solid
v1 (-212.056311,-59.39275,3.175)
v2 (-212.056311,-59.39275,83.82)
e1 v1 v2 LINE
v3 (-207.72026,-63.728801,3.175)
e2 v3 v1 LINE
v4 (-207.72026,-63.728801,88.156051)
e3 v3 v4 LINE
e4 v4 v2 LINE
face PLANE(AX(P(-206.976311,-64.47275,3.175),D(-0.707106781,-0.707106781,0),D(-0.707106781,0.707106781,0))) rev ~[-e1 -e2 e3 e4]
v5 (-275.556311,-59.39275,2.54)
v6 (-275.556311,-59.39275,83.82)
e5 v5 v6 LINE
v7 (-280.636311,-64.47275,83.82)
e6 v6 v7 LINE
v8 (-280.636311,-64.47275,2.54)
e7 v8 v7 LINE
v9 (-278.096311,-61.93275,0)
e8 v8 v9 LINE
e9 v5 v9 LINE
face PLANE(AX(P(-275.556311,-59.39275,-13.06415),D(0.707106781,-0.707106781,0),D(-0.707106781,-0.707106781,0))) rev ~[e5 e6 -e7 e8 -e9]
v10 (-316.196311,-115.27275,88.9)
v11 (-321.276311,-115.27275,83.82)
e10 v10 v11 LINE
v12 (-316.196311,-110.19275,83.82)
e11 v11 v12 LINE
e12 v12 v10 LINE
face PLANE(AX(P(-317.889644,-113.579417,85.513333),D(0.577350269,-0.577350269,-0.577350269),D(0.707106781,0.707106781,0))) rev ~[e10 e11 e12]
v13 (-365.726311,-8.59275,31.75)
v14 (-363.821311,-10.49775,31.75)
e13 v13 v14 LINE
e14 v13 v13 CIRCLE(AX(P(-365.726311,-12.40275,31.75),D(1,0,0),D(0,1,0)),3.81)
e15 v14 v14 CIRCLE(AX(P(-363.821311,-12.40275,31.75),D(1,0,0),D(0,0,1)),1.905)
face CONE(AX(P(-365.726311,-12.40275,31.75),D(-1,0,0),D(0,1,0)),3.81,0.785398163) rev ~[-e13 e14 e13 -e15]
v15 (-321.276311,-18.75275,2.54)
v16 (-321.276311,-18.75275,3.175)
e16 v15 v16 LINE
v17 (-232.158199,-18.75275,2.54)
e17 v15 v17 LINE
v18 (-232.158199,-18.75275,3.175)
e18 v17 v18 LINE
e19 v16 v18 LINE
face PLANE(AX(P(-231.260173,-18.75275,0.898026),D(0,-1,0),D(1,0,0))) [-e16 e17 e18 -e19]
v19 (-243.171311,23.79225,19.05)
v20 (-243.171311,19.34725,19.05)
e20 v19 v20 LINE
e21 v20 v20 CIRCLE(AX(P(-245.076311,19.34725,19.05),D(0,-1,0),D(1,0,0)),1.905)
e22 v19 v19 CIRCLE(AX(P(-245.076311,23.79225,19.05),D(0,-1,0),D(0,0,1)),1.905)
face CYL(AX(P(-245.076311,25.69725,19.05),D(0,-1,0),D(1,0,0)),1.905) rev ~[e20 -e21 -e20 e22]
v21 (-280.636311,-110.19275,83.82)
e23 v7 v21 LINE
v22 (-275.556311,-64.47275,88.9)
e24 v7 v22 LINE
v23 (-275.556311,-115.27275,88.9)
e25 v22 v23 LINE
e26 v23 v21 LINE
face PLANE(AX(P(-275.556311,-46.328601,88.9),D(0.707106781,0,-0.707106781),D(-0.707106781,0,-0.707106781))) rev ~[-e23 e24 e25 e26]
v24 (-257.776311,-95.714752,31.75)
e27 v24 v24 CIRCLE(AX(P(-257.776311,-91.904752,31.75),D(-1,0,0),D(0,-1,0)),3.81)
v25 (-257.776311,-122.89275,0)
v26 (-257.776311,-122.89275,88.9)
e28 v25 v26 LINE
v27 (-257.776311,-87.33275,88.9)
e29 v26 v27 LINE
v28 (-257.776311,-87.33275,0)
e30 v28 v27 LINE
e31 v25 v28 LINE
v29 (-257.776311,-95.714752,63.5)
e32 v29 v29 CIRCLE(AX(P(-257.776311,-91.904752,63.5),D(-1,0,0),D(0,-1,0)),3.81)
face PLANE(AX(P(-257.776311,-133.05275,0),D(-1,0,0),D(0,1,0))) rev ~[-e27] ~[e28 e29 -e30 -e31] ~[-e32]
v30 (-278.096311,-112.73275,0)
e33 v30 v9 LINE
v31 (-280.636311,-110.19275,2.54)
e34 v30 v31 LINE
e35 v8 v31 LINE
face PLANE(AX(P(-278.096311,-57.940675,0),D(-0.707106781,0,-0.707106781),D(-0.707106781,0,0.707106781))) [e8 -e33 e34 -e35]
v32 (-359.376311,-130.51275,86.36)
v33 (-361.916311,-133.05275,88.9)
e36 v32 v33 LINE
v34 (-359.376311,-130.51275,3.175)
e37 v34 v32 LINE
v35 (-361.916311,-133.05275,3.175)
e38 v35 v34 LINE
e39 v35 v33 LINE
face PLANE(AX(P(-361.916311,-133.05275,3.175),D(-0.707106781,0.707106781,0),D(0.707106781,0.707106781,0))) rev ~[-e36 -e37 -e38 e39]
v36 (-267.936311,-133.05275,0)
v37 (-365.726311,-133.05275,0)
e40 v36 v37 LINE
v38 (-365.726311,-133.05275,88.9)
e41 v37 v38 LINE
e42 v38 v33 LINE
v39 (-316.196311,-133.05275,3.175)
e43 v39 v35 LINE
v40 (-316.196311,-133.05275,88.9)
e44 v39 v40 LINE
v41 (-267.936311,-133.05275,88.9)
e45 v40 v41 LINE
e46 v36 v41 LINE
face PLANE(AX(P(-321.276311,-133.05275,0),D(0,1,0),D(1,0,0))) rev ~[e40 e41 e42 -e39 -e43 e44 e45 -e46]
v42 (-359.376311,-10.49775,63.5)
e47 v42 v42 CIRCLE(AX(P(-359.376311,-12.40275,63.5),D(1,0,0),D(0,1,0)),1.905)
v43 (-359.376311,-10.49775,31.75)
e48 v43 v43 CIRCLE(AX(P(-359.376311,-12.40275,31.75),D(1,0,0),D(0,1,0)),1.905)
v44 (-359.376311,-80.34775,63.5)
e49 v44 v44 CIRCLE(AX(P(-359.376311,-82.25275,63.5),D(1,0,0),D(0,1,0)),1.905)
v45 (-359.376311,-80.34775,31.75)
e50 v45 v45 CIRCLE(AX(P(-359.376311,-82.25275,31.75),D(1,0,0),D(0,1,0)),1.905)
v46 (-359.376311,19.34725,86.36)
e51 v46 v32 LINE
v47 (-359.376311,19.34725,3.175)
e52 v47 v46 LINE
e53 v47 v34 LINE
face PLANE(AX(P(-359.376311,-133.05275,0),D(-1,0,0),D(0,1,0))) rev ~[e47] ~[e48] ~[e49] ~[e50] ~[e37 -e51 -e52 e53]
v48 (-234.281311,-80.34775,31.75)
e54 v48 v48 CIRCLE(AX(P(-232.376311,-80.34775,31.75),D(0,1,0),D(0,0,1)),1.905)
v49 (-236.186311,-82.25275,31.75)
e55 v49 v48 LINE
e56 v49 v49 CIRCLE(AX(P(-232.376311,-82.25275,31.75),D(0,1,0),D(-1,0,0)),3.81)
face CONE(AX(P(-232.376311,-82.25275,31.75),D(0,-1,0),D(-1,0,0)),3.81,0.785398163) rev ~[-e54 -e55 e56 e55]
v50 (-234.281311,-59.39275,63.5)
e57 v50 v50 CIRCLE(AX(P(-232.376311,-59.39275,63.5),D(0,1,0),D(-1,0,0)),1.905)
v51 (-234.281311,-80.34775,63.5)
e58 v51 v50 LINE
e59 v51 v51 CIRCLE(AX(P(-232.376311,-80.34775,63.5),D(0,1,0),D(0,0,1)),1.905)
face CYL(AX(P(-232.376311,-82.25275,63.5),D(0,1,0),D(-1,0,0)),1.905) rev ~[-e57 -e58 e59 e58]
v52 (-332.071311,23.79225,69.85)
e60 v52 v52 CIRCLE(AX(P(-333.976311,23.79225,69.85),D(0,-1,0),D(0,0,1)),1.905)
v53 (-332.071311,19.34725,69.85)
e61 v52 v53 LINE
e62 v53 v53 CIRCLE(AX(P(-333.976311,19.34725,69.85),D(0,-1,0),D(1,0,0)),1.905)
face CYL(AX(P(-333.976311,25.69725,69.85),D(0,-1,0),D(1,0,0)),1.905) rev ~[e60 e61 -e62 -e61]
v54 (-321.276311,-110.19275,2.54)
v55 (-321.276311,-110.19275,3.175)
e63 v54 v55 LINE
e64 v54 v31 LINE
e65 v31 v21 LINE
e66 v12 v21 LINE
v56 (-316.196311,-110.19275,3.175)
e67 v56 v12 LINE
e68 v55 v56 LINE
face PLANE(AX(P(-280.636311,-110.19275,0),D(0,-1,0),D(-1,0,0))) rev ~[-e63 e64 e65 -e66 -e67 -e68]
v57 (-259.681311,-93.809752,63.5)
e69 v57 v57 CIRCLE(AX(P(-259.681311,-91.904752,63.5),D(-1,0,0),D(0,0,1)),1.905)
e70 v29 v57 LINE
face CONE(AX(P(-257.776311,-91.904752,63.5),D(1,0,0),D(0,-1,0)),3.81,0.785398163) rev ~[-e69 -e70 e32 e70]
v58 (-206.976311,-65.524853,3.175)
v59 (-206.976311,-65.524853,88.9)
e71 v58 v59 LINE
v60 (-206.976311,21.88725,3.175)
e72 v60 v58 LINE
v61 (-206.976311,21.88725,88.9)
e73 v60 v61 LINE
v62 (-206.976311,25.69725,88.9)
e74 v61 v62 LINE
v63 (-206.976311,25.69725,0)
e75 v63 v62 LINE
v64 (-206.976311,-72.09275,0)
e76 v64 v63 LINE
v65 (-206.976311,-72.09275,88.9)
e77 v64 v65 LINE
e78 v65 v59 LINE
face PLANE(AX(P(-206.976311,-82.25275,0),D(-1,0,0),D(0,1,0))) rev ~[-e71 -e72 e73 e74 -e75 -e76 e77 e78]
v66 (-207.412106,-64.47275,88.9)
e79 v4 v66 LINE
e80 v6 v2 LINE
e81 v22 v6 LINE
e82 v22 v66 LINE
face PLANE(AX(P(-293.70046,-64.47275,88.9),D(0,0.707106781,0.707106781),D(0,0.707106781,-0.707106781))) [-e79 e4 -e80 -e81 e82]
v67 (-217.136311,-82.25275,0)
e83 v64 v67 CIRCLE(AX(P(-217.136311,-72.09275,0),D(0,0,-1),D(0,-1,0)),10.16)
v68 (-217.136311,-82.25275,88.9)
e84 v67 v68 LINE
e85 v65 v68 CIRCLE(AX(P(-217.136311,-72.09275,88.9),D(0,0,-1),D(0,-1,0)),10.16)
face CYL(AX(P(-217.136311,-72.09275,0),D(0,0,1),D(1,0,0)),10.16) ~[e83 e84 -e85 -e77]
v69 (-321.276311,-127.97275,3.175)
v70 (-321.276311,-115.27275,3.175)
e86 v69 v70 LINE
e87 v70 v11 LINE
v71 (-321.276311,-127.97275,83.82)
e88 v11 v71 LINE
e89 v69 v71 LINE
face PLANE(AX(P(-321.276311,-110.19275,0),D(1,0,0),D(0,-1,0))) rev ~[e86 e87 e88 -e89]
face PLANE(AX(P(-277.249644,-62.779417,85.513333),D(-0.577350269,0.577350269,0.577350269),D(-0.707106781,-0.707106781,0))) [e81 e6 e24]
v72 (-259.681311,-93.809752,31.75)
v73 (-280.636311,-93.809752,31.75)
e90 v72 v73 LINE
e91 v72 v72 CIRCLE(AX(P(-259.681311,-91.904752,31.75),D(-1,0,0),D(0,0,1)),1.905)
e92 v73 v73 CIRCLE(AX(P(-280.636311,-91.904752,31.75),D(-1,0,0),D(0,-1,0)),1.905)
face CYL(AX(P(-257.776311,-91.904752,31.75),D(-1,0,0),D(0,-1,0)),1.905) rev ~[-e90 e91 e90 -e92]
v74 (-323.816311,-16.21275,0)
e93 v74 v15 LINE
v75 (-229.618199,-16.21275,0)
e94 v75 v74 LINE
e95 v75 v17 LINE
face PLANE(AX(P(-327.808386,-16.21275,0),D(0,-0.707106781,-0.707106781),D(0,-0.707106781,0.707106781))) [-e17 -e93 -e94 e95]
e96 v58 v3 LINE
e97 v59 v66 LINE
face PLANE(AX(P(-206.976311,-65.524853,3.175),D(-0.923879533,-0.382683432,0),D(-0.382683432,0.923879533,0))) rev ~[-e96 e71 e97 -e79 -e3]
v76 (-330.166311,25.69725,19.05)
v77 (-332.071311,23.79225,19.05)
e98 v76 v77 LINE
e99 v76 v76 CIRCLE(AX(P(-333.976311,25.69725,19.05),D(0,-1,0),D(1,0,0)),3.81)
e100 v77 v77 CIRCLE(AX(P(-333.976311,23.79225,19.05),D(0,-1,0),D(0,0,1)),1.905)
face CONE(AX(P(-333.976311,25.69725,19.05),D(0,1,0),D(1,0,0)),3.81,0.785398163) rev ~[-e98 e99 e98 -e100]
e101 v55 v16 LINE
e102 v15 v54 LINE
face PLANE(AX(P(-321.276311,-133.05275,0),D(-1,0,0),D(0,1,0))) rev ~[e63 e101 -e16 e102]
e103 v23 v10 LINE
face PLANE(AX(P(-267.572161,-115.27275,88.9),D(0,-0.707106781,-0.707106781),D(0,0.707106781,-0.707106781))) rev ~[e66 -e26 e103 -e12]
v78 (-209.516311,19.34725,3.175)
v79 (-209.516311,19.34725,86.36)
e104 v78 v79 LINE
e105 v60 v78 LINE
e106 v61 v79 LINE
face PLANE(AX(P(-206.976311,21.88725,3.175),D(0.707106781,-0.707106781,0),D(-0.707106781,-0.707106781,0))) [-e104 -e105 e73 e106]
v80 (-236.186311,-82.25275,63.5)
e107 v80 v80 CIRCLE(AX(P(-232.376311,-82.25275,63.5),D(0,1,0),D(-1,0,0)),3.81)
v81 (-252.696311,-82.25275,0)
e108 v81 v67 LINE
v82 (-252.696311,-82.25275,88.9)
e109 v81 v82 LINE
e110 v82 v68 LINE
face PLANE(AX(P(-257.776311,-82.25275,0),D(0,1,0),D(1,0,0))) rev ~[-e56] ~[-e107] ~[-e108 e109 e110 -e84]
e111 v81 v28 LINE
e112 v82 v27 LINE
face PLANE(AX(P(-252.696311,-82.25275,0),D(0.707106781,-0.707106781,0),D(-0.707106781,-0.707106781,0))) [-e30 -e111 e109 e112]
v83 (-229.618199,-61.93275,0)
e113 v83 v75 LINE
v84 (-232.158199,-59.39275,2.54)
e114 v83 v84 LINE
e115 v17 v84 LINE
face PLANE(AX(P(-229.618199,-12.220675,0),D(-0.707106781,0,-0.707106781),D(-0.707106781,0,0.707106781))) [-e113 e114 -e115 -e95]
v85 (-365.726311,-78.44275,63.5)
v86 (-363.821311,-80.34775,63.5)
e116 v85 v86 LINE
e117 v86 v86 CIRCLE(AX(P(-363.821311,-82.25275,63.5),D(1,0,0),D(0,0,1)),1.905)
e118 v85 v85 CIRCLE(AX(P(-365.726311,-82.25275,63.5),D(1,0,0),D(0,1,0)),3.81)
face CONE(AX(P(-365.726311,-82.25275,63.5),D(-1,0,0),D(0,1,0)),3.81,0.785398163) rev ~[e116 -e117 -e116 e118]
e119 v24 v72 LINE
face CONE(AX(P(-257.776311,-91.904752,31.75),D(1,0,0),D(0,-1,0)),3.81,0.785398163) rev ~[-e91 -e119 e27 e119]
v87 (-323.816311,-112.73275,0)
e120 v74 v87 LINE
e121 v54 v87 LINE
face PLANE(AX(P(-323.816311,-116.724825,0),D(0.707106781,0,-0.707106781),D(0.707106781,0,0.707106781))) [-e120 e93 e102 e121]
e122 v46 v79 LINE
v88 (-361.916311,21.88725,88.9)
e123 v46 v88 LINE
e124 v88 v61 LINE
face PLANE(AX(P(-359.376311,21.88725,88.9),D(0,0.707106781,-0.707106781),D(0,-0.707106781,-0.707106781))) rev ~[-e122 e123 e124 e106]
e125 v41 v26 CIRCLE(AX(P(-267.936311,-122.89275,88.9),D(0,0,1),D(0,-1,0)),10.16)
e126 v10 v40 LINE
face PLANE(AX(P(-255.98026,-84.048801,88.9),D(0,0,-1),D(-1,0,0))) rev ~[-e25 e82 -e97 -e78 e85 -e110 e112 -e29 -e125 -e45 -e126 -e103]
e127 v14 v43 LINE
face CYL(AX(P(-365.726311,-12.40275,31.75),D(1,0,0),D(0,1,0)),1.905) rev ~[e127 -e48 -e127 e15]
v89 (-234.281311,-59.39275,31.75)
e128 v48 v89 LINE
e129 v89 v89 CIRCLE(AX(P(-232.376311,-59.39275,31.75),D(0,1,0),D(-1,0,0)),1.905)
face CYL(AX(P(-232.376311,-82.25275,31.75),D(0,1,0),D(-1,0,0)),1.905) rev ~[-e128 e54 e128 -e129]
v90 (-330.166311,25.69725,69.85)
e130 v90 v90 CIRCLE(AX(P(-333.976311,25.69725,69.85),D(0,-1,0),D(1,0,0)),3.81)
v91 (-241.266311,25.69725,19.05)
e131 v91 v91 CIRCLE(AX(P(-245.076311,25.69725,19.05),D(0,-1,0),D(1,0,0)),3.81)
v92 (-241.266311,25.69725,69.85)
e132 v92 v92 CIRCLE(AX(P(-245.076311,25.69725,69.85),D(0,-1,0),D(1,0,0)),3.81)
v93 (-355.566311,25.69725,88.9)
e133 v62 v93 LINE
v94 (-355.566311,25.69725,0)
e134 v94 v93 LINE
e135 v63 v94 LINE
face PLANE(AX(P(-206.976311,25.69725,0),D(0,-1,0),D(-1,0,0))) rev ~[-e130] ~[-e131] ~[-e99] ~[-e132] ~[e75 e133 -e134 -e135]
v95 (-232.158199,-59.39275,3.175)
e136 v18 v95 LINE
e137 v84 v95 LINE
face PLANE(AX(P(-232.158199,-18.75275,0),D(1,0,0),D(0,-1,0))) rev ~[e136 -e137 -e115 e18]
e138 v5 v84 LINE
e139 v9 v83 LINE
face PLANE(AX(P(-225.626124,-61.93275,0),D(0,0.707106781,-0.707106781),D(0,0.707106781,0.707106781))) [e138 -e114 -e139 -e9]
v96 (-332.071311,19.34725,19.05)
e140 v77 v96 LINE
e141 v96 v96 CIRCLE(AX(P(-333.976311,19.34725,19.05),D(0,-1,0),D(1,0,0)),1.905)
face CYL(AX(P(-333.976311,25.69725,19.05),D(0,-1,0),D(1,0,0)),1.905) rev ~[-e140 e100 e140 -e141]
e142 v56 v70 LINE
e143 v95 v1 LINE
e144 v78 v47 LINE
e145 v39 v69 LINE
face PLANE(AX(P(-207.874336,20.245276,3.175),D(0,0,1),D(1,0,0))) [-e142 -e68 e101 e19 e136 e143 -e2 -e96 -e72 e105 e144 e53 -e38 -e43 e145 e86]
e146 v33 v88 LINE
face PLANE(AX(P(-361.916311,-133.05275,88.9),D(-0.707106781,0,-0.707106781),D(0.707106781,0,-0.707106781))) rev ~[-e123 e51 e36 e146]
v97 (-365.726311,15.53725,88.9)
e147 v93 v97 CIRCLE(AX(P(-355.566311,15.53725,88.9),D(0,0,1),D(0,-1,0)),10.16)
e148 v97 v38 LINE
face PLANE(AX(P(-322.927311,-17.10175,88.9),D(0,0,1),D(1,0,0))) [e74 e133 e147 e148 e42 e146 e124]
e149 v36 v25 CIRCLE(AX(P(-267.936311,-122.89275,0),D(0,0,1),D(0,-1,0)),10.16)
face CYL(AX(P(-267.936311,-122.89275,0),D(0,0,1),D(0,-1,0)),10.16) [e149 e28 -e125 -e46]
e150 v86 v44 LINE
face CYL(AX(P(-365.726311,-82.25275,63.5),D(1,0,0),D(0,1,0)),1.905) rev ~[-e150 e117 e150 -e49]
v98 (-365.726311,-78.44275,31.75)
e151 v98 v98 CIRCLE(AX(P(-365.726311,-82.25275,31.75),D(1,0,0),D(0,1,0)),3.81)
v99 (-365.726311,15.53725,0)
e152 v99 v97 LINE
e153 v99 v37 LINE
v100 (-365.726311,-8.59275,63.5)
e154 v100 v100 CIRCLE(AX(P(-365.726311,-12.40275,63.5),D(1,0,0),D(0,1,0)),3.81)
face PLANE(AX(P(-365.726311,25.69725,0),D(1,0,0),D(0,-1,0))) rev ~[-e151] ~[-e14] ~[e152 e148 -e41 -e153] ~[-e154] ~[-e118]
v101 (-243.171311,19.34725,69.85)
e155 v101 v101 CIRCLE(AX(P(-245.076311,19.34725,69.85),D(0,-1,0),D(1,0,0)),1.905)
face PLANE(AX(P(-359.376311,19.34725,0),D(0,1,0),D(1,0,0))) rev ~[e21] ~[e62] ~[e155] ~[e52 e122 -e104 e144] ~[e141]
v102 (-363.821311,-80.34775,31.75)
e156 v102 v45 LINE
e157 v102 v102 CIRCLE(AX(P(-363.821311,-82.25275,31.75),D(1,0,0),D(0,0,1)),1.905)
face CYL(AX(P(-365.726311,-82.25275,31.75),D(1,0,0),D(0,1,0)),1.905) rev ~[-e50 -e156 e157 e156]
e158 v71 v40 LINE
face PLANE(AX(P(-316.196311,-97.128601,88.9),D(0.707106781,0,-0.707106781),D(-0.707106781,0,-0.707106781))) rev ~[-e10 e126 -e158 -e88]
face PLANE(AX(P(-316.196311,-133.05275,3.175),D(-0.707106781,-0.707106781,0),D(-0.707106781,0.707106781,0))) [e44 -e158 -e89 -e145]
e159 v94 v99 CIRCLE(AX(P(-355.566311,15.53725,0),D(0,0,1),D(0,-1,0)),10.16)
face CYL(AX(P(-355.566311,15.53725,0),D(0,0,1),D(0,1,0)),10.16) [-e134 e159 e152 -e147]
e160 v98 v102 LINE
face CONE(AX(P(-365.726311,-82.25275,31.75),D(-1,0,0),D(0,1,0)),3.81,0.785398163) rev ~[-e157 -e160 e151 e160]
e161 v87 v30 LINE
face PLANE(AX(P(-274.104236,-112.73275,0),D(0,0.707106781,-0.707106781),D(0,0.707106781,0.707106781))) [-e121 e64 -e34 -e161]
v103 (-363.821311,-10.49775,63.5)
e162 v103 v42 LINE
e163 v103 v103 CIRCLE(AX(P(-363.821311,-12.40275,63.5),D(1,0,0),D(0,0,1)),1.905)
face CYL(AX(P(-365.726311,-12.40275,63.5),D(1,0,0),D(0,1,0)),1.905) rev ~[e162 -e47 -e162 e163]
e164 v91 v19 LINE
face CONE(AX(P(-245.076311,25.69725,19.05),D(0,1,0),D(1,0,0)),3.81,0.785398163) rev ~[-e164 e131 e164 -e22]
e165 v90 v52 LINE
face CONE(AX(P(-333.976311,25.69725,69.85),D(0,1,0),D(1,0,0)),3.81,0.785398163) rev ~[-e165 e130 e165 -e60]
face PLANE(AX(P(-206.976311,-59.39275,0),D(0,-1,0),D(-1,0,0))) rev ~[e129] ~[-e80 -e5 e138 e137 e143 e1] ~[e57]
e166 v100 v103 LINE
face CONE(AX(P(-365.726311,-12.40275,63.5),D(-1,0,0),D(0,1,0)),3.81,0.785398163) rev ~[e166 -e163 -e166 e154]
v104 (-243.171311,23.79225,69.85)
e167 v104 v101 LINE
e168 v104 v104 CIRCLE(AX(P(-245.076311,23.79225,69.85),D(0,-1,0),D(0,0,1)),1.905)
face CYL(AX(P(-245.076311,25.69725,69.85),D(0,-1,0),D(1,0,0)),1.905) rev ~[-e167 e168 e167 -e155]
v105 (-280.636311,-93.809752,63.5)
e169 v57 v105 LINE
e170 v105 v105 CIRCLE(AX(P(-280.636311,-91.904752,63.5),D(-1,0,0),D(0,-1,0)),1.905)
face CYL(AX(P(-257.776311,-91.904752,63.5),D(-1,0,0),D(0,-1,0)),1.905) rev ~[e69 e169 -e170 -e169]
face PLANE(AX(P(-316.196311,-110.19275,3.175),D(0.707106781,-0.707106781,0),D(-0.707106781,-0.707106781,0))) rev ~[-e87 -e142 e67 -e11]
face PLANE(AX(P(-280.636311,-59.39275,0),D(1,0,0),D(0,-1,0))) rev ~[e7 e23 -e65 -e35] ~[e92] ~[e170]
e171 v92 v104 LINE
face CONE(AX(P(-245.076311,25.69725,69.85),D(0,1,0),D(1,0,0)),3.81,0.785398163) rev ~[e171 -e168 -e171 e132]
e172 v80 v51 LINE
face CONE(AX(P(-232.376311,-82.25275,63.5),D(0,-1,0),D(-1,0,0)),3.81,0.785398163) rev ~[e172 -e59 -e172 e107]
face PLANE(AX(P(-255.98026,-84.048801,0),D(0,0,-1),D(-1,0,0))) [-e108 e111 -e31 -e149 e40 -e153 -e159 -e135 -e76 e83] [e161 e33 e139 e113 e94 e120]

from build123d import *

# Parameters (mm, degrees)
F1_DEPTH        = 3.175
F2_DEPTH        = 88.9
F4_D            = 3.81
F4_DEPTH        = 25.4
F4_CSINK_D      = 7.62
F4_CSINK_ANGLE  = 90
F4_TIP          = 1.1446394792
F6_D            = 3.81
F6_DEPTH        = 25.4
F6_CSINK_D      = 7.62
F6_CSINK_ANGLE  = 90
F6_TIP          = 1.1446394792
F8_D            = 3.81
F8_DEPTH        = 25.4
F8_CSINK_D      = 7.62
F8_CSINK_ANGLE  = 90
F8_TIP          = 1.1446394792
F10_D           = 3.81
F10_DEPTH       = 25.4
F10_CSINK_D     = 7.62
F10_CSINK_ANGLE = 90
F10_TIP         = 1.1446394792
F11_T1_DEPTH    = 88.9
F11_T3_DEPTH    = 6.4524666085
F11_T5_DEPTH    = 6.4524666085
F11_T7_DEPTH    = 98.7891495789
F11_T9_DEPTH    = 115.0282991577
F11_T11_DEPTH   = 53.7041495789
F11_T13_DEPTH   = 63.8641495789
F11_T15_DEPTH   = 99.7882991577
F11_T17_DEPTH   = 48.9882991577
F11_T23_DEPTH   = 63.8641495789
F11_T27_DEPTH   = 53.7041495789
F12_R           = 10.16
F13_T1_DEPTH    = 91.44
F13_T3_DEPTH    = 52.2520747895
F13_T5_DEPTH    = 40.64
F13_T7_DEPTH    = 158.9320747894
F13_T9_DEPTH    = 158.9320747894
F13_T11_DEPTH   = 88.591569985
F13_T13_DEPTH   = 92.2570747894
F13_T15_DEPTH   = 49.9301865966
F13_T17_DEPTH   = 40.64
F13_T19_DEPTH   = 89.1181118071
F13_T25_DEPTH   = 47.1720747894
F13_T29_DEPTH   = 97.9720747894
F13_T36_DEPTH   = 95.6501865965
F13_T40_DEPTH   = 97.9720747894
F13_T47_DEPTH   = 47.1720747894
F13_T51_DEPTH   = 58.7841495789
F13_T58_DEPTH   = 158.9320747894
F13_S59_R       = 10.16
F13_T60_DEPTH   = 81
F13_T64_DEPTH   = 158.9320747894
F13_S66_R       = 10.16
F13_T67_DEPTH   = 81
F13_T73_DEPTH   = 56.462261386
F13_T77_DEPTH   = 47.1720747894
F13_T84_DEPTH   = 47.1720747894
F13_T88_DEPTH   = 95.6501865965


# Not quite as in the source:
# - a fillet or chamfer that OpenCascade refuses, or shapes differently, is made with other operations: its cross-section is extruded or revolved along the edge and cut away or added
# - a feature of the source that left no trace in its solid (it failed there, or was rolled back) is left out
# - a feature names something its author has since deleted; it is built from what else it names


with BuildPart() as f1:
    # F0 (on Top) → F1 (new body)
    with BuildSketch(Plane.XY):
        Polygon((-206.9763107598, 19.3472499192), (-359.3763107598, 19.3472499192), (-359.3763107598, -133.0527500808), (-321.2763107598, -133.0527500808), (-321.2763107598, -110.1927500808), (-321.2763107598, -18.7527500808), (-232.3763107598, -18.7527500808), (-232.1581989527, -18.7527500808), (-232.1581989527, -59.3927500808), (-206.9763107598, -59.3927500808), align=None)
    extrude(amount=F1_DEPTH)

    # F0 (on Top) → F2 (join)
    with BuildSketch(Plane.XY):
        Polygon((-206.9763107598, -82.2527500808), (-206.9763107598, -59.3927500808), (-232.1581989527, -59.3927500808), (-232.3763107598, -59.3927500808), (-280.6363107598, -59.3927500808), (-280.6363107598, -110.1927500808), (-321.2763107598, -110.1927500808), (-321.2763107598, -133.0527500808), (-257.7763107598, -133.0527500808), (-257.7763107598, -82.2527500808), align=None)
        Polygon((-359.3763107598, -133.0527500808), (-359.3763107598, 19.3472499192), (-206.9763107598, 19.3472499192), (-206.9763107598, 25.6972499192), (-365.7263107598, 25.6972499192), (-365.7263107598, -133.0527500808), align=None)
    extrude(amount=F2_DEPTH)

    # F4
    with Locations(Plane.XZ.offset(82.2527500808)):
        with Locations((-232.3763107598, 63.5), (-232.3763107598, 31.75)):
            CounterSinkHole(F4_D / 2, F4_CSINK_D / 2, depth=F4_DEPTH, counter_sink_angle=F4_CSINK_ANGLE)
            with Locations((0, 0, -(F4_DEPTH + F4_TIP / 2))):  # 118° drill point
                Cone(0, F4_D / 2, F4_TIP, mode=Mode.SUBTRACT)

    # F6
    with Locations(Plane.YZ.offset(-257.7763107598)):
        with Locations((-91.9047519565, 63.5), (-91.9047519565, 31.75)):
            CounterSinkHole(F6_D / 2, F6_CSINK_D / 2, depth=F6_DEPTH, counter_sink_angle=F6_CSINK_ANGLE)
            with Locations((0, 0, -(F6_DEPTH + F6_TIP / 2))):  # 118° drill point
                Cone(0, F6_D / 2, F6_TIP, mode=Mode.SUBTRACT)

    # F8
    with Locations(Plane(origin=(-365.7263107598, 0, 0), x_dir=(0, -1, 0), z_dir=(-1, 0, 0))):
        with Locations((12.4027500808, 63.5), (82.2527500808, 63.5), (82.2527500808, 31.75), (12.4027500808, 31.75)):
            CounterSinkHole(F8_D / 2, F8_CSINK_D / 2, depth=F8_DEPTH, counter_sink_angle=F8_CSINK_ANGLE)
            with Locations((0, 0, -(F8_DEPTH + F8_TIP / 2))):  # 118° drill point
                Cone(0, F8_D / 2, F8_TIP, mode=Mode.SUBTRACT)

    # F10
    with Locations(Plane(origin=(0, 25.6972499192, 0), x_dir=(-1, 0, 0), z_dir=(0, 1, 0))):
        with Locations((245.0763107598, 69.85), (245.0763107598, 19.05), (333.9763107598, 19.05), (333.9763107598, 69.85)):
            CounterSinkHole(F10_D / 2, F10_CSINK_D / 2, depth=F10_DEPTH, counter_sink_angle=F10_CSINK_ANGLE)
            with Locations((0, 0, -(F10_DEPTH + F10_TIP / 2))):  # 118° drill point
                Cone(0, F10_D / 2, F10_TIP, mode=Mode.SUBTRACT)

    # F11: chamfer of 5.08 on 10 edges, made by hand

    # F11_s2 → F11_t1 (join)
    with BuildSketch(Plane.XY):
        Polygon((-252.6963107598, -82.2527500808), (-257.7763107598, -87.3327500808), (-257.7763107598, -82.2527500808), align=None)
    extrude(amount=F11_T1_DEPTH)

    # F11_s4 → F11_t3 (cut)
    with BuildSketch(Plane(origin=(-96.6078535597, 96.6078535597, 96.6078535597), x_dir=(-0.7071067812, -0.7071067812, 0), z_dir=(-0.5773502692, 0.5773502692, 0.5773502692))):
        Polygon((301.5025963442, -15.6618580633), (305.0946987926, -9.4401541166), (308.686801241, -15.6618580633), align=None)
    extrude(amount=F11_T3_DEPTH, mode=Mode.SUBTRACT)

    # F11_s6 → F11_t5 (cut)
    with BuildSketch(Plane(origin=(-99.9945202263, 99.9945202263, 99.9945202263), x_dir=(-0.7071067812, -0.7071067812, 0), z_dir=(-0.5773502692, 0.5773502692, 0.5773502692))):
        Polygon((240.4368547209, -13.5879567477), (236.8447522725, -19.8096606944), (244.0289571693, -19.8096606944), align=None)
    extrude(amount=F11_T5_DEPTH, mode=Mode.SUBTRACT)

    # F11_s8 → F11_t7 (cut)
    with BuildSketch(Plane.XY.offset(3.175)):
        Polygon((-316.1963107598, -110.1927500808), (-321.2763107598, -115.2727500808), (-321.2763107598, -110.1927500808), align=None)
        Polygon((-316.1963107598, -133.0527500808), (-321.2763107598, -127.9727500808), (-321.2763107598, -133.0527500808), align=None)
        Polygon((-206.9763107598, -64.4727500808), (-212.0563107598, -59.3927500808), (-206.9763107598, -59.3927500808), align=None)
    extrude(amount=F11_T7_DEPTH, mode=Mode.SUBTRACT)

    # F11_s10 → F11_t9 (cut)
    with BuildSketch(Plane.XY.offset(-13.0641495789)):
        Polygon((-275.5563107598, -59.3927500808), (-280.6363107598, -64.4727500808), (-280.6363107598, -59.3927500808), align=None)
    extrude(amount=F11_T9_DEPTH, mode=Mode.SUBTRACT)

    # F11_s12 → F11_t11 (cut)
    with BuildSketch(Plane.YZ.offset(-334.3404603386)):
        Polygon((-115.2727500808, 88.9), (-110.1927500808, 83.82), (-110.1927500808, 88.9), align=None)
    extrude(amount=F11_T11_DEPTH, mode=Mode.SUBTRACT)

    # F11_s14 → F11_t13 (cut)
    with BuildSketch(Plane.XZ.offset(46.328600502)):
        Polygon((-275.5563107598, 88.9), (-280.6363107598, 83.82), (-280.6363107598, 88.9), align=None)
    extrude(amount=F11_T13_DEPTH, mode=Mode.SUBTRACT)

    # F11_s16 → F11_t15 (cut)
    with BuildSketch(Plane.YZ.offset(-293.7004603386)):
        Polygon((-64.4727500808, 88.9), (-59.3927500808, 83.82), (-59.3927500808, 88.9), align=None)
    extrude(amount=F11_T15_DEPTH, mode=Mode.SUBTRACT)

    # F11_s18 → F11_t17 (cut)
    with BuildSketch(Plane.XZ.offset(97.128600502)):
        Polygon((-316.1963107598, 88.9), (-321.2763107598, 83.82), (-321.2763107598, 88.9), align=None)
    extrude(amount=F11_T17_DEPTH, mode=Mode.SUBTRACT)


with BuildPart() as f11_tool21:
    # F11_s22 → F11_t23 (new body)
    with BuildSketch(Plane.XZ.offset(59.3927500808)):
        Polygon((-275.5563107598, 88.9), (-280.6363107598, 83.82), (-280.6363107598, 88.9), align=None)
    extrude(amount=F11_T23_DEPTH)

    split(bisect_by=Plane.XZ.offset(110.1927500808), keep=Keep.TOP)


with BuildPart() as f11_tool25:
    # F11_s26 → F11_t27 (new body)
    with BuildSketch(Plane.YZ.offset(-267.5721611809)):
        Polygon((-115.2727500808, 88.9), (-110.1927500808, 83.82), (-110.1927500808, 88.9), align=None)
    extrude(amount=-F11_T27_DEPTH)

    split(bisect_by=Plane.YZ.offset(-280.6363107598), keep=Keep.TOP)


with BuildPart() as f11_tool21_1:
    add(f11_tool21.part)

    # F11_t29: intersect F11_tool25
    add(f11_tool25.part, mode=Mode.INTERSECT)


with BuildPart() as f1_1:
    add(f1.part)

    # F11_t19: cut F11_tool21
    add(f11_tool21_1.part, mode=Mode.SUBTRACT)

    # F12
    f12_edges = [f1_1.edges().sort_by_distance(p)[0] for p in [
        (-257.776311, -133.05275, 44.45),
        (-206.976311, -82.25275, 44.45),
        (-365.726311, 25.69725, 44.45),
    ]]
    fillet(f12_edges, radius=F12_R)

    # F13: chamfer of 2.54 on 11 edges, made by hand

    # F13_s2 → F13_t1 (cut)
    with BuildSketch(Plane.XZ.offset(18.7527500808)):
        Polygon((-323.8163107598, 0), (-321.2763107598, 2.54), (-321.2763107598, 0), align=None)
    extrude(amount=F13_T1_DEPTH, mode=Mode.SUBTRACT)

    # F13_s4 → F13_t3 (cut)
    with BuildSketch(Plane.XZ.offset(57.9406752914)):
        Polygon((-278.0963107598, 0), (-280.6363107598, 2.54), (-280.6363107598, 0), align=None)
    extrude(amount=F13_T3_DEPTH, mode=Mode.SUBTRACT)

    # F13_s6 → F13_t5 (cut)
    with BuildSketch(Plane.YZ.offset(-321.2763107598)):
        Polygon((-112.7327500808, 0), (-110.1927500808, 2.54), (-110.1927500808, 0), align=None)
    extrude(amount=F13_T5_DEPTH, mode=Mode.SUBTRACT)

    # F13_s8 → F13_t7 (cut)
    with BuildSketch(Plane.YZ.offset(-359.3763107598)):
        Polygon((21.8872499192, 88.9), (19.3472499192, 86.36), (19.3472499192, 88.9), align=None)
    extrude(amount=F13_T7_DEPTH, mode=Mode.SUBTRACT)

    # F13_s10 → F13_t9 (cut)
    with BuildSketch(Plane.XZ.offset(-19.3472499192)):
        Polygon((-361.9163107598, 88.9), (-359.3763107598, 86.36), (-359.3763107598, 88.9), align=None)
    extrude(amount=F13_T9_DEPTH, mode=Mode.SUBTRACT)

    # F13_s12 → F13_t11 (cut)
    with BuildSketch(Plane.XY.offset(3.175)):
        Polygon((-206.9763107598, -65.5248525292), (-207.7202595356, -63.728801305), (-206.9763107598, -64.4727500808), align=None)
    extrude(amount=F13_T11_DEPTH, mode=Mode.SUBTRACT)

    # F13_s14 → F13_t13 (cut)
    with BuildSketch(Plane.XY.offset(3.175)):
        Polygon((-206.9763107598, 21.8872499192), (-209.5163107598, 19.3472499192), (-206.9763107598, 19.3472499192), align=None)
        Polygon((-361.9163107598, -133.0527500808), (-359.3763107598, -130.5127500808), (-359.3763107598, -133.0527500808), align=None)
    extrude(amount=F13_T13_DEPTH, mode=Mode.SUBTRACT)

    # F13_s16 → F13_t15 (cut)
    with BuildSketch(Plane.YZ.offset(-282.0883855492)):
        Polygon((-61.9327500808, 0), (-59.3927500808, 2.54), (-59.3927500808, 0), align=None)
    extrude(amount=F13_T15_DEPTH, mode=Mode.SUBTRACT)

    # F13_s18 → F13_t17 (cut)
    with BuildSketch(Plane.XZ.offset(18.7527500808)):
        Polygon((-229.6181989527, 0), (-232.1581989527, 2.54), (-232.1581989527, 0), align=None)
    extrude(amount=F13_T17_DEPTH, mode=Mode.SUBTRACT)

    # F13_s20 → F13_t19 (cut)
    with BuildSketch(Plane.YZ.offset(-321.2763107598)):
        Polygon((-16.2127500808, 0), (-18.7527500808, 2.54), (-18.7527500808, 0), align=None)
    extrude(amount=F13_T19_DEPTH, mode=Mode.SUBTRACT)


with BuildPart() as f13_tool23:
    # F13_s24 → F13_t25 (new body)
    with BuildSketch(Plane.YZ.offset(-280.6363107598)):
        Polygon((-112.7327500808, 0), (-110.1927500808, 2.54), (-110.1927500808, 0), align=None)
    extrude(amount=-F13_T25_DEPTH)

    split(bisect_by=Plane.YZ.offset(-321.2763107598), keep=Keep.BOTTOM)


with BuildPart() as f13_tool27:
    # F13_s28 → F13_t29 (new body)
    with BuildSketch(Plane.XZ.offset(116.7248248703)):
        Polygon((-323.8163107598, 0), (-321.2763107598, 2.54), (-321.2763107598, 0), align=None)
    extrude(amount=-F13_T29_DEPTH)

    split(bisect_by=Plane.XZ.offset(110.1927500808), keep=Keep.TOP)


with BuildPart() as f13_tool23_1:
    add(f13_tool23.part)

    # F13_t31: intersect F13_tool27
    add(f13_tool27.part, mode=Mode.INTERSECT)


with BuildPart() as f1_2:
    add(f1_1.part)

    # F13_t21: cut F13_tool23
    add(f13_tool23_1.part, mode=Mode.SUBTRACT)


with BuildPart() as f13_tool34:
    # F13_s35 → F13_t36 (new body)
    with BuildSketch(Plane.YZ.offset(-327.8083855492)):
        Polygon((-16.2127500808, 0), (-18.7527500808, 2.54), (-18.7527500808, 0), align=None)
    extrude(amount=F13_T36_DEPTH)

    split(bisect_by=Plane.YZ.offset(-321.2763107598), keep=Keep.BOTTOM)


with BuildPart() as f13_tool38:
    # F13_s39 → F13_t40 (new body)
    with BuildSketch(Plane.XZ.offset(110.1927500808)):
        Polygon((-323.8163107598, 0), (-321.2763107598, 2.54), (-321.2763107598, 0), align=None)
    extrude(amount=-F13_T40_DEPTH)

    split(bisect_by=Plane.XZ.offset(18.7527500808), keep=Keep.BOTTOM)


with BuildPart() as f13_tool34_1:
    add(f13_tool34.part)

    # F13_t42: intersect F13_tool38
    add(f13_tool38.part, mode=Mode.INTERSECT)


with BuildPart() as f1_3:
    add(f1_2.part)

    # F13_t32: cut F13_tool34
    add(f13_tool34_1.part, mode=Mode.SUBTRACT)


with BuildPart() as f13_tool45:
    # F13_s46 → F13_t47 (new body)
    with BuildSketch(Plane.YZ.offset(-274.1042359703)):
        Polygon((-112.7327500808, 0), (-110.1927500808, 2.54), (-110.1927500808, 0), align=None)
    extrude(amount=-F13_T47_DEPTH)

    split(bisect_by=Plane.YZ.offset(-280.6363107598), keep=Keep.TOP)


with BuildPart() as f13_tool49:
    # F13_s50 → F13_t51 (new body)
    with BuildSketch(Plane.XZ.offset(57.9406752914)):
        Polygon((-278.0963107598, 0), (-280.6363107598, 2.54), (-280.6363107598, 0), align=None)
    extrude(amount=F13_T51_DEPTH)

    split(bisect_by=Plane.XZ.offset(110.1927500808), keep=Keep.TOP)


with BuildPart() as f13_tool45_1:
    add(f13_tool45.part)

    # F13_t53: intersect F13_tool49
    add(f13_tool49.part, mode=Mode.INTERSECT)


with BuildPart() as f1_4:
    add(f1_3.part)

    # F13_t43: cut F13_tool45
    add(f13_tool45_1.part, mode=Mode.SUBTRACT)


with BuildPart() as f13_tool56:
    # F13_s57 → F13_t58 (new body)
    with BuildSketch(Plane.YZ.offset(-365.9083855492)):
        Polygon((21.8872499192, 88.9), (19.3472499192, 86.36), (19.3472499192, 88.9), align=None)
    extrude(amount=F13_T58_DEPTH)

    # F13_s59 → F13_t60 (intersect, symmetric)
    with BuildSketch(Plane.XY.offset(87.6)):
        with Locations((-355.5663107598, 15.5372499192)):
            Circle(F13_S59_R)
    extrude(amount=F13_T60_DEPTH, both=True, mode=Mode.INTERSECT)

    split(bisect_by=Plane.YZ.offset(-359.3763107598), keep=Keep.BOTTOM)


with BuildPart() as f13_tool62:
    # F13_s63 → F13_t64 (new body)
    with BuildSketch(Plane.XZ.offset(133.0527500808)):
        Polygon((-361.9163107598, 88.9), (-359.3763107598, 86.36), (-359.3763107598, 88.9), align=None)
    extrude(amount=-F13_T64_DEPTH)

    split(bisect_by=Plane.XZ.offset(-19.3472499192), keep=Keep.BOTTOM)

    # F13_s66 → F13_t67 (intersect, symmetric)
    with BuildSketch(Plane.XY.offset(87.6)):
        with Locations((-355.5663107598, 15.5372499192)):
            Circle(F13_S66_R)
    extrude(amount=F13_T67_DEPTH, both=True, mode=Mode.INTERSECT)


with BuildPart() as f13_tool56_1:
    add(f13_tool56.part)

    # F13_t68: intersect F13_tool62
    add(f13_tool62.part, mode=Mode.INTERSECT)


with BuildPart() as f1_5:
    add(f1_4.part)

    # F13_t54: cut F13_tool56
    add(f13_tool56_1.part, mode=Mode.SUBTRACT)


with BuildPart() as f13_tool71:
    # F13_s72 → F13_t73 (new body)
    with BuildSketch(Plane.YZ.offset(-225.6261241632)):
        Polygon((-61.9327500808, 0), (-59.3927500808, 2.54), (-59.3927500808, 0), align=None)
    extrude(amount=-F13_T73_DEPTH)

    split(bisect_by=Plane.YZ.offset(-232.1581989527), keep=Keep.TOP)


with BuildPart() as f13_tool75:
    # F13_s76 → F13_t77 (new body)
    with BuildSketch(Plane.XZ.offset(18.7527500808)):
        Polygon((-229.6181989527, 0), (-232.1581989527, 2.54), (-232.1581989527, 0), align=None)
    extrude(amount=F13_T77_DEPTH)

    split(bisect_by=Plane.XZ.offset(59.3927500808), keep=Keep.TOP)


with BuildPart() as f13_tool71_1:
    add(f13_tool71.part)

    # F13_t79: intersect F13_tool75
    add(f13_tool75.part, mode=Mode.INTERSECT)


with BuildPart() as f1_6:
    add(f1_5.part)

    # F13_t69: cut F13_tool71
    add(f13_tool71_1.part, mode=Mode.SUBTRACT)


with BuildPart() as f13_tool82:
    # F13_s83 → F13_t84 (new body)
    with BuildSketch(Plane.XZ.offset(12.2206752914)):
        Polygon((-229.6181989527, 0), (-232.1581989527, 2.54), (-232.1581989527, 0), align=None)
    extrude(amount=F13_T84_DEPTH)

    split(bisect_by=Plane.XZ.offset(18.7527500808), keep=Keep.BOTTOM)


with BuildPart() as f13_tool86:
    # F13_s87 → F13_t88 (new body)
    with BuildSketch(Plane.YZ.offset(-321.2763107598)):
        Polygon((-16.2127500808, 0), (-18.7527500808, 2.54), (-18.7527500808, 0), align=None)
    extrude(amount=F13_T88_DEPTH)

    split(bisect_by=Plane.YZ.offset(-232.1581989527), keep=Keep.TOP)


with BuildPart() as f13_tool82_1:
    add(f13_tool82.part)

    # F13_t90: intersect F13_tool86
    add(f13_tool86.part, mode=Mode.INTERSECT)


with BuildPart() as f1_7:
    add(f1_6.part)

    # F13_t80: cut F13_tool82
    add(f13_tool82_1.part, mode=Mode.SUBTRACT)


solid = f1_7.part
